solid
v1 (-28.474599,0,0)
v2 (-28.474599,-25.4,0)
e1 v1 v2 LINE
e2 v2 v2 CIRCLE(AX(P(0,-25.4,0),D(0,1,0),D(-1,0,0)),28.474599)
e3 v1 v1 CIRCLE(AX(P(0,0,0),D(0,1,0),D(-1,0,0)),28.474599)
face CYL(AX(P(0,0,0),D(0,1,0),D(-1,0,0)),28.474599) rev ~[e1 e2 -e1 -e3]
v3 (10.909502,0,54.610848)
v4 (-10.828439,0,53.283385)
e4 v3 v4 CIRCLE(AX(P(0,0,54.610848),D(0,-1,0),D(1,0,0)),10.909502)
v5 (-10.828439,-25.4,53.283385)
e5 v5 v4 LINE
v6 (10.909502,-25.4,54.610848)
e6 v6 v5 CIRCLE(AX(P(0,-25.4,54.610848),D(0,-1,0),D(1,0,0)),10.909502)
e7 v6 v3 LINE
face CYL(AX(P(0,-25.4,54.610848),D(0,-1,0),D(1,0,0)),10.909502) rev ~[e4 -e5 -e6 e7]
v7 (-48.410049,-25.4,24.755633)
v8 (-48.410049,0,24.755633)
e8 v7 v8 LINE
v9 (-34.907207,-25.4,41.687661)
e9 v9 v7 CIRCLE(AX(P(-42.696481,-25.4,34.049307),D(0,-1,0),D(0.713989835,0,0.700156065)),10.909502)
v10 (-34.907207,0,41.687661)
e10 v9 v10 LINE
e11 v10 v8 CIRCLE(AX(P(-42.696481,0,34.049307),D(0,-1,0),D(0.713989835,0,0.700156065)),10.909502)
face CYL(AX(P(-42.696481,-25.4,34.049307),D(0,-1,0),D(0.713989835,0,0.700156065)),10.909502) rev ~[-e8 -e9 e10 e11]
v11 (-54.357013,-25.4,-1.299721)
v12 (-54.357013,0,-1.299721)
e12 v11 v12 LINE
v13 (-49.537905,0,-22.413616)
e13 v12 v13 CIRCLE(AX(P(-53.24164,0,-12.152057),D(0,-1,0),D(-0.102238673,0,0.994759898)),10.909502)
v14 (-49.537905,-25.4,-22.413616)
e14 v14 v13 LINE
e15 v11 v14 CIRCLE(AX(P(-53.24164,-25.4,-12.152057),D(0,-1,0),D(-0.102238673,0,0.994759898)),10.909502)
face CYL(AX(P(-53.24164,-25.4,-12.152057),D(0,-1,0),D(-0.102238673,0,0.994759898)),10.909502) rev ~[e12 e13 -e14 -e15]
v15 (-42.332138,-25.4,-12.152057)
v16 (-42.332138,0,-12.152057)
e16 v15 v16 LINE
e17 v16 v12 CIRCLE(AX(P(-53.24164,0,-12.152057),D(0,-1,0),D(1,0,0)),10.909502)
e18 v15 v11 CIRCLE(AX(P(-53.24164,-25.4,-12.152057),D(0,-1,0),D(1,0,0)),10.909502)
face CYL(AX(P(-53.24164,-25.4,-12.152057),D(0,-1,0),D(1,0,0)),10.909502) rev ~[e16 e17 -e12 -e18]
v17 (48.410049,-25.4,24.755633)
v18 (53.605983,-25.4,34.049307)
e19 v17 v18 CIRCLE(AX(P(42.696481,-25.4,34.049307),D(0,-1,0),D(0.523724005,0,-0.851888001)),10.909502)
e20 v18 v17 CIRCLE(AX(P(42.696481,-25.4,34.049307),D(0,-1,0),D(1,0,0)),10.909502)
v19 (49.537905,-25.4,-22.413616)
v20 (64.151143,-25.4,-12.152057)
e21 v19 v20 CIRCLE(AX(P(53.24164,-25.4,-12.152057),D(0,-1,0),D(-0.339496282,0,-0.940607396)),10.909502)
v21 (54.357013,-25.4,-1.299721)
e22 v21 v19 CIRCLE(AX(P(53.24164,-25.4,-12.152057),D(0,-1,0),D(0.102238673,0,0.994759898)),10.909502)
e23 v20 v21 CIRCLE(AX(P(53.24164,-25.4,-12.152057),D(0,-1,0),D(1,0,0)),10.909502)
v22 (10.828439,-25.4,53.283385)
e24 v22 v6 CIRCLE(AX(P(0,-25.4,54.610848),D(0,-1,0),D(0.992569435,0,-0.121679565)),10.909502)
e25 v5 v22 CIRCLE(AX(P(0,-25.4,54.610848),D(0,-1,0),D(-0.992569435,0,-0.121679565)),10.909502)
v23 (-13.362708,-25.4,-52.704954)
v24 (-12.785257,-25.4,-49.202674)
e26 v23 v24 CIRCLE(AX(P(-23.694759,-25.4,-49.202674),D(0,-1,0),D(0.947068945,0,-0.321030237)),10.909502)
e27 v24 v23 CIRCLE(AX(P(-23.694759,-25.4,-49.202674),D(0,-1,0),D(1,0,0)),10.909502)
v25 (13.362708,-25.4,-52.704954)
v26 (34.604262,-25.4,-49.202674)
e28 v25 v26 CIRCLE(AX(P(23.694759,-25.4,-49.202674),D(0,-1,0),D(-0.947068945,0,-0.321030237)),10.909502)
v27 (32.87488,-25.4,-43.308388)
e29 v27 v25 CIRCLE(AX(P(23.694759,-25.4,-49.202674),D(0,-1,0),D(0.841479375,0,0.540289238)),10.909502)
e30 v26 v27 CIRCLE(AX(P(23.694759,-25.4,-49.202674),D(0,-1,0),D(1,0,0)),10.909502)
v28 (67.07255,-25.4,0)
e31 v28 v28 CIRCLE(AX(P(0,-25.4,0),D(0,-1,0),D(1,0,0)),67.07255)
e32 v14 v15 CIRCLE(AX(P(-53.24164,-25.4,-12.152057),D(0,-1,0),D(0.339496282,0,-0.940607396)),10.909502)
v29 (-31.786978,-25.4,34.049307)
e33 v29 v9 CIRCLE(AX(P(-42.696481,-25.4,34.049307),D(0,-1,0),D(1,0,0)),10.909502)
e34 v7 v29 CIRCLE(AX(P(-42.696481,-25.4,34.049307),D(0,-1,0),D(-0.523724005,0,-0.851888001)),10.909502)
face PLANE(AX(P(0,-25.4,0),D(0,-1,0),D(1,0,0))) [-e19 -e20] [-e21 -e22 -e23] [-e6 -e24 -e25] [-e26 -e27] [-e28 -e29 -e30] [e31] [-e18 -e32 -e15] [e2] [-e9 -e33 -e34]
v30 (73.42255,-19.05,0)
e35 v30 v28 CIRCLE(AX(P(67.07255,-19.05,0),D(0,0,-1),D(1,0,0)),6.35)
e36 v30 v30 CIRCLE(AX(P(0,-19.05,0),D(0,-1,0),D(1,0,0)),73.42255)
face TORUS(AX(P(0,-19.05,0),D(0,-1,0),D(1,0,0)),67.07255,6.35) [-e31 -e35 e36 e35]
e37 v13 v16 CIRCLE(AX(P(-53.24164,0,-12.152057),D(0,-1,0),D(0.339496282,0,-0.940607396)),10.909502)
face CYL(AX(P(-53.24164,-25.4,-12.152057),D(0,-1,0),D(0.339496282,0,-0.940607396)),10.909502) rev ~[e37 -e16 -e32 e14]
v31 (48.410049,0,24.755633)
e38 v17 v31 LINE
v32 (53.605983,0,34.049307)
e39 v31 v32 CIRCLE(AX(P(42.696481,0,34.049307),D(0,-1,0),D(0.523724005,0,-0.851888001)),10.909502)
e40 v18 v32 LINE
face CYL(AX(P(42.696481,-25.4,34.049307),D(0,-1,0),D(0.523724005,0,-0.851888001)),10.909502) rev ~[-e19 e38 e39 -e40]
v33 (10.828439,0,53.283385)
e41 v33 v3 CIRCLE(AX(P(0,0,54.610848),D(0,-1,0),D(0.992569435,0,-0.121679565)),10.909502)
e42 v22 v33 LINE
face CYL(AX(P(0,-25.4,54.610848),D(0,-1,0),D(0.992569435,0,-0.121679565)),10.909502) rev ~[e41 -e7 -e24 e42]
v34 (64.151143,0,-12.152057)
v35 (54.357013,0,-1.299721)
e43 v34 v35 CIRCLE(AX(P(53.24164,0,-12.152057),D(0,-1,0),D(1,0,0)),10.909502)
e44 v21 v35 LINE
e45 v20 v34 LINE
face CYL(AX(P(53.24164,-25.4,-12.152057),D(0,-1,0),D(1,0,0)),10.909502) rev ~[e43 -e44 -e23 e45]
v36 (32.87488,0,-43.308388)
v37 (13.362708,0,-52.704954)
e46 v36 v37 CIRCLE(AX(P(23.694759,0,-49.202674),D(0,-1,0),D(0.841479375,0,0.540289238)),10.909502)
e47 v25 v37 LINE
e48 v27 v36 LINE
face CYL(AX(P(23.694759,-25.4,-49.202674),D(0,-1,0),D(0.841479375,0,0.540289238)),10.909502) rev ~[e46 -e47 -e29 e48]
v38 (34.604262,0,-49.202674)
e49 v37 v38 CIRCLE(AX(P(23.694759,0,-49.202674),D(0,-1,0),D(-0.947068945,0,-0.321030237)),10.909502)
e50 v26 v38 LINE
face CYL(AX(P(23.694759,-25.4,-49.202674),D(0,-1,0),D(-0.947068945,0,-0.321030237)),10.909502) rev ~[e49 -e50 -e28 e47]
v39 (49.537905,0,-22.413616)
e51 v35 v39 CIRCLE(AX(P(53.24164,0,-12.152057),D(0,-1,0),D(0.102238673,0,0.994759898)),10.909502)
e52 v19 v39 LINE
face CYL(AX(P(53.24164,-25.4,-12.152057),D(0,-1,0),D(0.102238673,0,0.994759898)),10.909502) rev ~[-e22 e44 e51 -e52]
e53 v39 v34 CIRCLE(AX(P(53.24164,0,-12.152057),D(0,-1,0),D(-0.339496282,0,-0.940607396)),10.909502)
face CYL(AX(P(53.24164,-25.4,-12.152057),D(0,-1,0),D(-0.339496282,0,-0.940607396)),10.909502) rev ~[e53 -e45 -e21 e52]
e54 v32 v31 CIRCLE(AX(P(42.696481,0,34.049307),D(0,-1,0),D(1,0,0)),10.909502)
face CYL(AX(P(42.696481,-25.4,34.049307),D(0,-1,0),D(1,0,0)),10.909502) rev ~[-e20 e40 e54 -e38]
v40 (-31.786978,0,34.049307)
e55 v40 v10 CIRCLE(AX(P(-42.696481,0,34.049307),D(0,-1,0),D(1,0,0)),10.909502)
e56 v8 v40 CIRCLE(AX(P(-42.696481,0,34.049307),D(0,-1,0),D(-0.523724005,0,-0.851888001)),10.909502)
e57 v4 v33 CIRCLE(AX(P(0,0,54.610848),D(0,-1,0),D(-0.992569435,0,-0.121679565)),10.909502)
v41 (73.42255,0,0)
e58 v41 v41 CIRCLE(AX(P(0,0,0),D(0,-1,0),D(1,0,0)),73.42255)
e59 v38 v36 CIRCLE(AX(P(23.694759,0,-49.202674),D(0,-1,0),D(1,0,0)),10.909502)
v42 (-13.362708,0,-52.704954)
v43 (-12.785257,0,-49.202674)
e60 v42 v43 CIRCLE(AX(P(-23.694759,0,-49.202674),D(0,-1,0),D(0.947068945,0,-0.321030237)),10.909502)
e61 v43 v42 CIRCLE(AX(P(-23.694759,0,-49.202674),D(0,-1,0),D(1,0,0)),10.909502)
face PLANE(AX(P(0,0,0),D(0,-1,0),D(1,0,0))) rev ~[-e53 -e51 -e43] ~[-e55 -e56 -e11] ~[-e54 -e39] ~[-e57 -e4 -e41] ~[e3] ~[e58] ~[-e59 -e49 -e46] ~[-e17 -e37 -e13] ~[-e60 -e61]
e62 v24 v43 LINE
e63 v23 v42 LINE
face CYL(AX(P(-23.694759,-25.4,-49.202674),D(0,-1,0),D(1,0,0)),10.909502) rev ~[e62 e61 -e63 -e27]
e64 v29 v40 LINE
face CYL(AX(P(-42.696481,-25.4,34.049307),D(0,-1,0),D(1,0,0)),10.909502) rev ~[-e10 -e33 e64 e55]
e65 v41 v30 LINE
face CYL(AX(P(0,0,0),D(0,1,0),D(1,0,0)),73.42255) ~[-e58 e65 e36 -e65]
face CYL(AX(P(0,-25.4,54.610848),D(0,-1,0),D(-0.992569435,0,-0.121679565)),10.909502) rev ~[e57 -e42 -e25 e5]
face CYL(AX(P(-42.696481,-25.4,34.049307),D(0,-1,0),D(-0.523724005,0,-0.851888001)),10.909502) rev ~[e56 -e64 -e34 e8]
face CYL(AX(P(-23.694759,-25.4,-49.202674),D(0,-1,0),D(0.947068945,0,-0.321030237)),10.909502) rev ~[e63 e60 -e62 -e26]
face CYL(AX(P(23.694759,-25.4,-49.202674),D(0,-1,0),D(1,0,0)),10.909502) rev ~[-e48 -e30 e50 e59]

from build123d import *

# Parameters (mm, degrees)
F0_R     = 73.4225499851
F1_DEPTH = 25.4
F3_R     = 6.35
F5_DEPTH = 25.4
F6_R     = 28.4745991817
F7_DEPTH = 25.4


with BuildPart() as f1:
    # F0 (on Front) → F1 (new body)
    with BuildSketch(Plane.XZ):
        Circle(F0_R)
    extrude(amount=F1_DEPTH)

    # F3
    f3_edges = [f1.edges().sort_by_distance(p)[0] for p in [
        (-73.42255, -25.4, 0),
    ]]
    fillet(f3_edges, radius=F3_R)

    # F4 (on face) → F5 (cut)
    with BuildSketch(Plane.XZ.offset(25.4)):
        with BuildLine():
            ThreePointArc((10.828438703, 53.2833849069), (10.8892176697, 53.9458802451), (10.9095024699, 54.6108484268))
            ThreePointArc((10.9095024699, 54.6108484268), (-0.6649681817, 65.5000660965), (-10.828438703, 53.2833849069))
            ThreePointArc((-10.828438703, 53.2833849069), (0, 54.3725499851), (10.828438703, 53.2833849069))
        make_face()
        with BuildLine():
            ThreePointArc((10.828438703, 53.2833849069), (0, 54.3725499851), (-10.828438703, 53.2833849069))
            ThreePointArc((-10.828438703, 53.2833849069), (0, 43.7013459569), (10.828438703, 53.2833849069))
        make_face()
        with BuildLine():
            ThreePointArc((-48.4100489141, 24.7556328141), (-42.5101713604, 33.9007304168), (-34.9072067114, 41.6876613819))
            ThreePointArc((-34.9072067114, 41.6876613819), (-51.2258730734, 40.8512705983), (-48.4100489141, 24.7556328141))
        make_face()
        with BuildLine():
            ThreePointArc((-31.7869781145, 34.049307065), (-32.5971155871, 38.1748459137), (-34.9072067114, 41.6876613819))
            ThreePointArc((-34.9072067114, 41.6876613819), (-42.5101713604, 33.9007304168), (-48.4100489141, 24.7556328141))
            ThreePointArc((-48.4100489141, 24.7556328141), (-37.3727104759, 24.5269798299), (-31.7869781145, 34.049307065))
        make_face()
        with BuildLine():
            ThreePointArc((48.4100489141, 24.7556328141), (42.5101713604, 33.9007304168), (34.9072067114, 41.6876613819))
            ThreePointArc((34.9072067114, 41.6876613819), (34.1670880954, 27.2473435317), (48.4100489141, 24.7556328141))
        make_face()
        with BuildLine():
            ThreePointArc((53.6059830542, 34.049307065), (46.8220194331, 44.1486720622), (34.9072067114, 41.6876613819))
            ThreePointArc((34.9072067114, 41.6876613819), (42.5101713604, 33.9007304168), (48.4100489141, 24.7556328141))
            ThreePointArc((48.4100489141, 24.7556328141), (52.2188078195, 28.7255369565), (53.6059830542, 34.049307065))
        make_face()
        with BuildLine():
            ThreePointArc((-49.5379049078, -22.4136157107), (-53.009316637, -12.0990306043), (-54.3570134948, -1.299721437))
            ThreePointArc((-54.3570134948, -1.299721437), (-63.8776189051, -14.5796496747), (-49.5379049078, -22.4136157107))
        make_face()
        with BuildLine():
            ThreePointArc((-42.3321379694, -12.1520569961), (-45.9324312127, -4.0531246824), (-54.3570134948, -1.299721437))
            ThreePointArc((-54.3570134948, -1.299721437), (-53.009316637, -12.0990306043), (-49.5379049078, -22.4136157107))
            ThreePointArc((-49.5379049078, -22.4136157107), (-44.3135063658, -18.421480104), (-42.3321379694, -12.1520569961))
        make_face()
        with BuildLine():
            ThreePointArc((49.5379049078, -22.4136157107), (53.009316637, -12.0990306043), (54.3570134948, -1.299721437))
            ThreePointArc((54.3570134948, -1.299721437), (42.6056619733, -9.7244643175), (49.5379049078, -22.4136157107))
        make_face()
        with BuildLine():
            ThreePointArc((64.1511429091, -12.1520569961), (61.340572753, -4.8428477695), (54.3570134948, -1.299721437))
            ThreePointArc((54.3570134948, -1.299721437), (53.009316637, -12.0990306043), (49.5379049078, -22.4136157107))
            ThreePointArc((49.5379049078, -22.4136157107), (59.5110635472, -21.0801910696), (64.1511429091, -12.1520569961))
        make_face()
        with BuildLine():
            ThreePointArc((-13.3627081169, -52.7049544509), (-23.5913652929, -48.9879748051), (-32.8748804356, -43.3083875044))
            ThreePointArc((-32.8748804356, -43.3083875044), (-28.4282148354, -59.031796372), (-13.3627081169, -52.7049544509))
        make_face()
        with BuildLine():
            ThreePointArc((-12.7852566419, -49.2026742823), (-20.6233841848, -38.7344413752), (-32.8748804356, -43.3083875044))
            ThreePointArc((-32.8748804356, -43.3083875044), (-23.5913652929, -48.9879748051), (-13.3627081169, -52.7049544509))
            ThreePointArc((-13.3627081169, -52.7049544509), (-12.930587523, -50.9774571271), (-12.7852566419, -49.2026742823))
        make_face()
        with BuildLine():
            ThreePointArc((13.3627081169, -52.7049544509), (23.5913652929, -48.9879748051), (32.8748804356, -43.3083875044))
            ThreePointArc((32.8748804356, -43.3083875044), (18.9613033883, -39.3735521926), (13.3627081169, -52.7049544509))
        make_face()
        with BuildLine():
            ThreePointArc((34.6042615817, -49.2026742823), (34.1629920189, -46.1312993553), (32.8748804356, -43.3083875044))
            ThreePointArc((32.8748804356, -43.3083875044), (23.5913652929, -48.9879748051), (13.3627081169, -52.7049544509))
            ThreePointArc((13.3627081169, -52.7049544509), (25.4695419566, -59.9668458711), (34.6042615817, -49.2026742823))
        make_face()
    extrude(amount=-F5_DEPTH, mode=Mode.SUBTRACT)

    # F6 (on face) → F7 (cut)
    with BuildSketch(Plane(origin=(0, 0, 0), x_dir=(-1, 0, 0), z_dir=(0, 1, 0))):
        Circle(F6_R)
    extrude(amount=-F7_DEPTH, mode=Mode.SUBTRACT)


solid = f1.part
